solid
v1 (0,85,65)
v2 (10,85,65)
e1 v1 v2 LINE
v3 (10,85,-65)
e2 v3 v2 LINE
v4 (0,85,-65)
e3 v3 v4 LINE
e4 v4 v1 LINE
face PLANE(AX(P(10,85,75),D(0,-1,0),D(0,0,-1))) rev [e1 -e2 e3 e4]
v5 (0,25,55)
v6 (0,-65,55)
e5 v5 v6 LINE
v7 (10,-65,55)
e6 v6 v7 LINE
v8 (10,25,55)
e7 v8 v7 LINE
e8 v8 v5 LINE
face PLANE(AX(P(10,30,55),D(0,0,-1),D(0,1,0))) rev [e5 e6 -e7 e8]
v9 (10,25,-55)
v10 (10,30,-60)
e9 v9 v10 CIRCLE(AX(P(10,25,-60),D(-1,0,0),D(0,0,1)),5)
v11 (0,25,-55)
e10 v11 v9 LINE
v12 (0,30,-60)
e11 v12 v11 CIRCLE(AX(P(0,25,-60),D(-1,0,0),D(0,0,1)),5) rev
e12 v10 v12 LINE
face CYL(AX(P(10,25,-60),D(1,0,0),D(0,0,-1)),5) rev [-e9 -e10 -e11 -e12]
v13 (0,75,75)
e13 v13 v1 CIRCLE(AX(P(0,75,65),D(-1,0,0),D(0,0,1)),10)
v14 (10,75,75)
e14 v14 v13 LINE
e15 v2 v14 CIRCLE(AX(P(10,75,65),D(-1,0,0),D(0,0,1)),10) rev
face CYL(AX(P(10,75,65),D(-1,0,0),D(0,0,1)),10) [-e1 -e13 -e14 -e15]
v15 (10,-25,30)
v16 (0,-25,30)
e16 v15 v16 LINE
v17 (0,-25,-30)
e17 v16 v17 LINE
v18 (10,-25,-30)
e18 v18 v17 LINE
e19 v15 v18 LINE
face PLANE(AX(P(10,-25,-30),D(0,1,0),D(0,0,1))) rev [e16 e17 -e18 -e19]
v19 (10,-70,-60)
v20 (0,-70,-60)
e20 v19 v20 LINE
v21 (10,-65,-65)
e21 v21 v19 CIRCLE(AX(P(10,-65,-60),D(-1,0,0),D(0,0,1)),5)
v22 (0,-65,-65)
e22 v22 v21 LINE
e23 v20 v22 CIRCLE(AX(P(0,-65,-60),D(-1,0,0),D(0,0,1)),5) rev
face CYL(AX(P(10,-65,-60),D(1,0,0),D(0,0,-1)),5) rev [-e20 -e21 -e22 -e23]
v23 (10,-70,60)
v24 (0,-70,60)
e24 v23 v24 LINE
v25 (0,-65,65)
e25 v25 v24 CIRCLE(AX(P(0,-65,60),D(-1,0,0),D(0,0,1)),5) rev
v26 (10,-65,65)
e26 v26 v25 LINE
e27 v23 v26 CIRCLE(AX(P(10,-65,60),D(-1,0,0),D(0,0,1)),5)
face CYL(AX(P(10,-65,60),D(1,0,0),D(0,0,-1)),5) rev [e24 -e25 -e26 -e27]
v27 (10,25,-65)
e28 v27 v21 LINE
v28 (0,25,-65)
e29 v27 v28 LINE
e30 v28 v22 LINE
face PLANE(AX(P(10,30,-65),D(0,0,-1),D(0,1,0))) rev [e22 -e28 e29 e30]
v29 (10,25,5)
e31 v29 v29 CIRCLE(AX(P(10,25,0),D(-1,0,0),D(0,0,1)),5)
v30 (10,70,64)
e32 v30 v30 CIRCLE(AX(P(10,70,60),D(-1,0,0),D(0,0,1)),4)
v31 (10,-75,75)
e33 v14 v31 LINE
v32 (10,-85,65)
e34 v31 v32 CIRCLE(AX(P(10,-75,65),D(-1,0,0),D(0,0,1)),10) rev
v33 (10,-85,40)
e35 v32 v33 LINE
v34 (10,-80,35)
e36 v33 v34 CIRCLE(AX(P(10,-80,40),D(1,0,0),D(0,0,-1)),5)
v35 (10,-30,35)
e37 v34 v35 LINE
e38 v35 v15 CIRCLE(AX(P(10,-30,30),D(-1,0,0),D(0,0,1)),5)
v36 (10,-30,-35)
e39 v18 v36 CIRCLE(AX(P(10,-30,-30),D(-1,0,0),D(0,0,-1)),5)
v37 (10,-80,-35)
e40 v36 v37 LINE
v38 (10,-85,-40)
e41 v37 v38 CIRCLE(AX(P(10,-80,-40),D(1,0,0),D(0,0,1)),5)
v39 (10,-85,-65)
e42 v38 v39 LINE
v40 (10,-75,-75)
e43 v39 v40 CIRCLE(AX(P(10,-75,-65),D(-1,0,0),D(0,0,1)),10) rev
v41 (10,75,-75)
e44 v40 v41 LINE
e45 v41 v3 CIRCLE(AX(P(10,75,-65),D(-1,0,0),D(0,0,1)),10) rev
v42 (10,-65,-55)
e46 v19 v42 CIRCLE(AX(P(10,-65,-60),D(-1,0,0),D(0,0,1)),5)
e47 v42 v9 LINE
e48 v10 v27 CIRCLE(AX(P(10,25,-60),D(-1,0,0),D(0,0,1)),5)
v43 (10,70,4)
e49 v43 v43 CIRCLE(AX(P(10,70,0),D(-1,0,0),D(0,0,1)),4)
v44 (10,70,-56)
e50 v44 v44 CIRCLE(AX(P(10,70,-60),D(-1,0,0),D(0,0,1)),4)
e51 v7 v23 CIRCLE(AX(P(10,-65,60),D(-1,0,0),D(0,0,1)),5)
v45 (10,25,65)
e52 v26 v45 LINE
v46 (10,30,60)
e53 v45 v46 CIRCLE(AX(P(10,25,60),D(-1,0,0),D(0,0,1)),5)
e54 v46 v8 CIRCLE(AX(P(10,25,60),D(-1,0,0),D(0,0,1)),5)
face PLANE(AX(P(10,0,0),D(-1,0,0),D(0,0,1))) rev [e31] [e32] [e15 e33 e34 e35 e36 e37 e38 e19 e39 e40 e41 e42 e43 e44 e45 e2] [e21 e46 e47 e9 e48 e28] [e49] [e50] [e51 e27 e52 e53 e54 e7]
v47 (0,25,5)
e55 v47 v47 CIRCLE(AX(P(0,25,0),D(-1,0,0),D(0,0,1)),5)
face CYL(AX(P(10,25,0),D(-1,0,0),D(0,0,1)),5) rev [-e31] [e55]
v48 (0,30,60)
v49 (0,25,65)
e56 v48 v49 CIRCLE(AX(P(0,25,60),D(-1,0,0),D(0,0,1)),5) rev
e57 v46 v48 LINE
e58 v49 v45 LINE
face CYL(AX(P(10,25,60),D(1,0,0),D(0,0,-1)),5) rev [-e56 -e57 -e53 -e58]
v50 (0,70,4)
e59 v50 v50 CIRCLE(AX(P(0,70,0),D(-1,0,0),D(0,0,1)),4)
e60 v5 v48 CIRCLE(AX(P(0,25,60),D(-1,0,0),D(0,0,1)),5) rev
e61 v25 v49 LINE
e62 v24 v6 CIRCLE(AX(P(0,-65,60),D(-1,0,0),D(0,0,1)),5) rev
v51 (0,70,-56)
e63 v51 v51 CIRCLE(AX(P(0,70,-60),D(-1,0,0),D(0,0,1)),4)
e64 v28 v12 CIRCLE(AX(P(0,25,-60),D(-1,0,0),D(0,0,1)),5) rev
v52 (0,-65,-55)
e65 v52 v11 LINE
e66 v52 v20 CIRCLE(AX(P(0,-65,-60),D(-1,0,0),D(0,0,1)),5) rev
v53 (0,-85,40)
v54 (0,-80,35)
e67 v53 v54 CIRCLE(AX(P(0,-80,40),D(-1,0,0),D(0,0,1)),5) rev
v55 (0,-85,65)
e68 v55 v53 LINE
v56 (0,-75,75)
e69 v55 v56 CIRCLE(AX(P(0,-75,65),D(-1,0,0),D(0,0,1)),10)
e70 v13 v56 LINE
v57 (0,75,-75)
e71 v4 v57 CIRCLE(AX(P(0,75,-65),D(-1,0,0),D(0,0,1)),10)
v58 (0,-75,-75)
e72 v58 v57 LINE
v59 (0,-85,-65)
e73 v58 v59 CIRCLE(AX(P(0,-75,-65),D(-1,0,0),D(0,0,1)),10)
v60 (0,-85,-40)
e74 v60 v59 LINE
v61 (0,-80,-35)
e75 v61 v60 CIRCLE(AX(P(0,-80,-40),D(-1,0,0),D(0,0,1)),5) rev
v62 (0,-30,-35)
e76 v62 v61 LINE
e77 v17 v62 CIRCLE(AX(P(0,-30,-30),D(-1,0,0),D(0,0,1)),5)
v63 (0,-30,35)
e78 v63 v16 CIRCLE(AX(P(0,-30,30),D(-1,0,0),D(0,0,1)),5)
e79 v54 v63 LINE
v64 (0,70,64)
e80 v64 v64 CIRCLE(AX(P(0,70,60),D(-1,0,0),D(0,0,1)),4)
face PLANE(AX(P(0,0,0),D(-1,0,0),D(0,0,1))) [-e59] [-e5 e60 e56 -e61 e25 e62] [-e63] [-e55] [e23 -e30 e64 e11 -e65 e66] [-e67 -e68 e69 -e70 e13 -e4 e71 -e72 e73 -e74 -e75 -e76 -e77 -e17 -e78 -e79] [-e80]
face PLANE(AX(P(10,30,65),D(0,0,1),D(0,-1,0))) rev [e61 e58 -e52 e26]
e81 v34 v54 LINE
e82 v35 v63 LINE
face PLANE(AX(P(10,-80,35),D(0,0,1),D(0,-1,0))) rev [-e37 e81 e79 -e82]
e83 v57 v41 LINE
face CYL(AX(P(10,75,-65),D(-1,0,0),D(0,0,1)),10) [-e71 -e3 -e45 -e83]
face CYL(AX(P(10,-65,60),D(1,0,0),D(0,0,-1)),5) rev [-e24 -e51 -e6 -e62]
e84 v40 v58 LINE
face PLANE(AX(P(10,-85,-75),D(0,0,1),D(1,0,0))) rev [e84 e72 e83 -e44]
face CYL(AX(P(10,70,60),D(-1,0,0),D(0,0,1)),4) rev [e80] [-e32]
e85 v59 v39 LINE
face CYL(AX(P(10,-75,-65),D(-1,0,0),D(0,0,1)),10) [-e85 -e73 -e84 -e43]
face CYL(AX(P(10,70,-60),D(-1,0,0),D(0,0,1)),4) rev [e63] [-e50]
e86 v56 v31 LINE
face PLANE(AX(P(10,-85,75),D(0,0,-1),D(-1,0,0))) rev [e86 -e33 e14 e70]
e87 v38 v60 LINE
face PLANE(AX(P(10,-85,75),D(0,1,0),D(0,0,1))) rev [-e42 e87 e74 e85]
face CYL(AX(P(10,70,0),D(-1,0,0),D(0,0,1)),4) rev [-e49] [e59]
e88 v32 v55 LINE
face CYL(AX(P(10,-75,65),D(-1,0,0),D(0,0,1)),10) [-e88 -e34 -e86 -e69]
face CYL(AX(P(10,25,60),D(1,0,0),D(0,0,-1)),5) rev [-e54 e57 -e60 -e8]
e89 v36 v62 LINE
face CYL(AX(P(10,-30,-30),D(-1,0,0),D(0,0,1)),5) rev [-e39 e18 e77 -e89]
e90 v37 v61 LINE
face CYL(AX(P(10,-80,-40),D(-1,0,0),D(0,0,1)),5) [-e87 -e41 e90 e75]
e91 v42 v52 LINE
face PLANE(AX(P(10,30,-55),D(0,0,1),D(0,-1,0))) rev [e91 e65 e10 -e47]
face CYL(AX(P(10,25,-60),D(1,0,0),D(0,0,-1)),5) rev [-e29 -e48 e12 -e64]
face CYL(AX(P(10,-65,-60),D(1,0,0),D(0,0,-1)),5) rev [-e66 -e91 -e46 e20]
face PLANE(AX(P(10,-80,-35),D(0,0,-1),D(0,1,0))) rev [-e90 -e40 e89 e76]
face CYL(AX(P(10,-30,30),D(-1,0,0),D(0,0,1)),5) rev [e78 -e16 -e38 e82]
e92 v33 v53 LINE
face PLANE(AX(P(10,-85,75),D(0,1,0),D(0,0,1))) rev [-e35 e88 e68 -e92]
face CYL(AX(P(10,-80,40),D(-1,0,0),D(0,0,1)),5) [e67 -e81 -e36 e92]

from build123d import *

# Parameters (mm, degrees)
SKETCH1_W               = 150
SKETCH1_H               = 170
BOSS_EXTRUDE1_DEPTH     = 10
CUT_EXTRUDE1_DEPTH      = 114.798066767
CUT_EXTRUDE1_DEPTH_BACK = 114.798066767
SKETCH4_R               = 4
SKETCH4_R_2             = 5
SKETCH4_W               = 10
SKETCH4_H               = 100
FILLET1_R               = 5
FILLET2_R               = 10


with BuildPart() as part:
    # Sketch1 → Boss-Extrude1 (new body)
    with BuildSketch(Plane(origin=(0, 0, 0), x_dir=(0, 0, -1), z_dir=(1, 0, 0))):
        Rectangle(SKETCH1_W, SKETCH1_H)
    extrude(amount=BOSS_EXTRUDE1_DEPTH)

    # Sketch4 → Cut-Extrude1 (cut, two sides: drawn at the far end of the back side and taken through both)
    with BuildSketch(Plane.ZY.offset(-CUT_EXTRUDE1_DEPTH_BACK)):
        with Locations((-60, 70)):
            Circle(SKETCH4_R)
        with Locations((0, 70)):
            Circle(SKETCH4_R)
        with Locations((60, 70)):
            Circle(SKETCH4_R)
        with Locations((0, 25)):
            Circle(SKETCH4_R_2)
        with BuildLine():
            Line((-40, -85), (40, -85))
            ThreePointArc((40, -85), (36.464466094, -83.535533906), (35, -80))
            Line((35, -80), (35, -30))
            ThreePointArc((35, -30), (33.535533906, -26.464466094), (30, -25))
            Line((30, -25), (-30, -25))
            ThreePointArc((-30, -25), (-33.535533906, -26.464466094), (-35, -30))
            Line((-35, -30), (-35, -80))
            ThreePointArc((-35, -80), (-36.464466094, -83.535533906), (-40, -85))
        make_face()
        with Locations((60, -20)):
            Rectangle(SKETCH4_W, SKETCH4_H)
        with Locations((-60, -20)):
            Rectangle(SKETCH4_W, SKETCH4_H)
    extrude(amount=CUT_EXTRUDE1_DEPTH + CUT_EXTRUDE1_DEPTH_BACK, mode=Mode.SUBTRACT)

    # Fillet1
    fillet1_edges = [part.edges().sort_by_distance(p)[0] for p in [
        (5, 30, 55),
        (5, 30, 65),
        (5, -70, 65),
        (5, -70, 55),
        (5, 30, -65),
        (5, 30, -55),
        (5, -70, -55),
        (5, -70, -65),
    ]]
    fillet(fillet1_edges, radius=FILLET1_R - 0.0001)  # a hair under: the kernel refuses the full size

    # Fillet2
    fillet2_edges = [part.edges().sort_by_distance(p)[0] for p in [
        (5, -85, -75),
        (5, -85, 75),
        (5, 85, 75),
        (5, 85, -75),
    ]]
    fillet(fillet2_edges, radius=FILLET2_R)


solid = part.part
